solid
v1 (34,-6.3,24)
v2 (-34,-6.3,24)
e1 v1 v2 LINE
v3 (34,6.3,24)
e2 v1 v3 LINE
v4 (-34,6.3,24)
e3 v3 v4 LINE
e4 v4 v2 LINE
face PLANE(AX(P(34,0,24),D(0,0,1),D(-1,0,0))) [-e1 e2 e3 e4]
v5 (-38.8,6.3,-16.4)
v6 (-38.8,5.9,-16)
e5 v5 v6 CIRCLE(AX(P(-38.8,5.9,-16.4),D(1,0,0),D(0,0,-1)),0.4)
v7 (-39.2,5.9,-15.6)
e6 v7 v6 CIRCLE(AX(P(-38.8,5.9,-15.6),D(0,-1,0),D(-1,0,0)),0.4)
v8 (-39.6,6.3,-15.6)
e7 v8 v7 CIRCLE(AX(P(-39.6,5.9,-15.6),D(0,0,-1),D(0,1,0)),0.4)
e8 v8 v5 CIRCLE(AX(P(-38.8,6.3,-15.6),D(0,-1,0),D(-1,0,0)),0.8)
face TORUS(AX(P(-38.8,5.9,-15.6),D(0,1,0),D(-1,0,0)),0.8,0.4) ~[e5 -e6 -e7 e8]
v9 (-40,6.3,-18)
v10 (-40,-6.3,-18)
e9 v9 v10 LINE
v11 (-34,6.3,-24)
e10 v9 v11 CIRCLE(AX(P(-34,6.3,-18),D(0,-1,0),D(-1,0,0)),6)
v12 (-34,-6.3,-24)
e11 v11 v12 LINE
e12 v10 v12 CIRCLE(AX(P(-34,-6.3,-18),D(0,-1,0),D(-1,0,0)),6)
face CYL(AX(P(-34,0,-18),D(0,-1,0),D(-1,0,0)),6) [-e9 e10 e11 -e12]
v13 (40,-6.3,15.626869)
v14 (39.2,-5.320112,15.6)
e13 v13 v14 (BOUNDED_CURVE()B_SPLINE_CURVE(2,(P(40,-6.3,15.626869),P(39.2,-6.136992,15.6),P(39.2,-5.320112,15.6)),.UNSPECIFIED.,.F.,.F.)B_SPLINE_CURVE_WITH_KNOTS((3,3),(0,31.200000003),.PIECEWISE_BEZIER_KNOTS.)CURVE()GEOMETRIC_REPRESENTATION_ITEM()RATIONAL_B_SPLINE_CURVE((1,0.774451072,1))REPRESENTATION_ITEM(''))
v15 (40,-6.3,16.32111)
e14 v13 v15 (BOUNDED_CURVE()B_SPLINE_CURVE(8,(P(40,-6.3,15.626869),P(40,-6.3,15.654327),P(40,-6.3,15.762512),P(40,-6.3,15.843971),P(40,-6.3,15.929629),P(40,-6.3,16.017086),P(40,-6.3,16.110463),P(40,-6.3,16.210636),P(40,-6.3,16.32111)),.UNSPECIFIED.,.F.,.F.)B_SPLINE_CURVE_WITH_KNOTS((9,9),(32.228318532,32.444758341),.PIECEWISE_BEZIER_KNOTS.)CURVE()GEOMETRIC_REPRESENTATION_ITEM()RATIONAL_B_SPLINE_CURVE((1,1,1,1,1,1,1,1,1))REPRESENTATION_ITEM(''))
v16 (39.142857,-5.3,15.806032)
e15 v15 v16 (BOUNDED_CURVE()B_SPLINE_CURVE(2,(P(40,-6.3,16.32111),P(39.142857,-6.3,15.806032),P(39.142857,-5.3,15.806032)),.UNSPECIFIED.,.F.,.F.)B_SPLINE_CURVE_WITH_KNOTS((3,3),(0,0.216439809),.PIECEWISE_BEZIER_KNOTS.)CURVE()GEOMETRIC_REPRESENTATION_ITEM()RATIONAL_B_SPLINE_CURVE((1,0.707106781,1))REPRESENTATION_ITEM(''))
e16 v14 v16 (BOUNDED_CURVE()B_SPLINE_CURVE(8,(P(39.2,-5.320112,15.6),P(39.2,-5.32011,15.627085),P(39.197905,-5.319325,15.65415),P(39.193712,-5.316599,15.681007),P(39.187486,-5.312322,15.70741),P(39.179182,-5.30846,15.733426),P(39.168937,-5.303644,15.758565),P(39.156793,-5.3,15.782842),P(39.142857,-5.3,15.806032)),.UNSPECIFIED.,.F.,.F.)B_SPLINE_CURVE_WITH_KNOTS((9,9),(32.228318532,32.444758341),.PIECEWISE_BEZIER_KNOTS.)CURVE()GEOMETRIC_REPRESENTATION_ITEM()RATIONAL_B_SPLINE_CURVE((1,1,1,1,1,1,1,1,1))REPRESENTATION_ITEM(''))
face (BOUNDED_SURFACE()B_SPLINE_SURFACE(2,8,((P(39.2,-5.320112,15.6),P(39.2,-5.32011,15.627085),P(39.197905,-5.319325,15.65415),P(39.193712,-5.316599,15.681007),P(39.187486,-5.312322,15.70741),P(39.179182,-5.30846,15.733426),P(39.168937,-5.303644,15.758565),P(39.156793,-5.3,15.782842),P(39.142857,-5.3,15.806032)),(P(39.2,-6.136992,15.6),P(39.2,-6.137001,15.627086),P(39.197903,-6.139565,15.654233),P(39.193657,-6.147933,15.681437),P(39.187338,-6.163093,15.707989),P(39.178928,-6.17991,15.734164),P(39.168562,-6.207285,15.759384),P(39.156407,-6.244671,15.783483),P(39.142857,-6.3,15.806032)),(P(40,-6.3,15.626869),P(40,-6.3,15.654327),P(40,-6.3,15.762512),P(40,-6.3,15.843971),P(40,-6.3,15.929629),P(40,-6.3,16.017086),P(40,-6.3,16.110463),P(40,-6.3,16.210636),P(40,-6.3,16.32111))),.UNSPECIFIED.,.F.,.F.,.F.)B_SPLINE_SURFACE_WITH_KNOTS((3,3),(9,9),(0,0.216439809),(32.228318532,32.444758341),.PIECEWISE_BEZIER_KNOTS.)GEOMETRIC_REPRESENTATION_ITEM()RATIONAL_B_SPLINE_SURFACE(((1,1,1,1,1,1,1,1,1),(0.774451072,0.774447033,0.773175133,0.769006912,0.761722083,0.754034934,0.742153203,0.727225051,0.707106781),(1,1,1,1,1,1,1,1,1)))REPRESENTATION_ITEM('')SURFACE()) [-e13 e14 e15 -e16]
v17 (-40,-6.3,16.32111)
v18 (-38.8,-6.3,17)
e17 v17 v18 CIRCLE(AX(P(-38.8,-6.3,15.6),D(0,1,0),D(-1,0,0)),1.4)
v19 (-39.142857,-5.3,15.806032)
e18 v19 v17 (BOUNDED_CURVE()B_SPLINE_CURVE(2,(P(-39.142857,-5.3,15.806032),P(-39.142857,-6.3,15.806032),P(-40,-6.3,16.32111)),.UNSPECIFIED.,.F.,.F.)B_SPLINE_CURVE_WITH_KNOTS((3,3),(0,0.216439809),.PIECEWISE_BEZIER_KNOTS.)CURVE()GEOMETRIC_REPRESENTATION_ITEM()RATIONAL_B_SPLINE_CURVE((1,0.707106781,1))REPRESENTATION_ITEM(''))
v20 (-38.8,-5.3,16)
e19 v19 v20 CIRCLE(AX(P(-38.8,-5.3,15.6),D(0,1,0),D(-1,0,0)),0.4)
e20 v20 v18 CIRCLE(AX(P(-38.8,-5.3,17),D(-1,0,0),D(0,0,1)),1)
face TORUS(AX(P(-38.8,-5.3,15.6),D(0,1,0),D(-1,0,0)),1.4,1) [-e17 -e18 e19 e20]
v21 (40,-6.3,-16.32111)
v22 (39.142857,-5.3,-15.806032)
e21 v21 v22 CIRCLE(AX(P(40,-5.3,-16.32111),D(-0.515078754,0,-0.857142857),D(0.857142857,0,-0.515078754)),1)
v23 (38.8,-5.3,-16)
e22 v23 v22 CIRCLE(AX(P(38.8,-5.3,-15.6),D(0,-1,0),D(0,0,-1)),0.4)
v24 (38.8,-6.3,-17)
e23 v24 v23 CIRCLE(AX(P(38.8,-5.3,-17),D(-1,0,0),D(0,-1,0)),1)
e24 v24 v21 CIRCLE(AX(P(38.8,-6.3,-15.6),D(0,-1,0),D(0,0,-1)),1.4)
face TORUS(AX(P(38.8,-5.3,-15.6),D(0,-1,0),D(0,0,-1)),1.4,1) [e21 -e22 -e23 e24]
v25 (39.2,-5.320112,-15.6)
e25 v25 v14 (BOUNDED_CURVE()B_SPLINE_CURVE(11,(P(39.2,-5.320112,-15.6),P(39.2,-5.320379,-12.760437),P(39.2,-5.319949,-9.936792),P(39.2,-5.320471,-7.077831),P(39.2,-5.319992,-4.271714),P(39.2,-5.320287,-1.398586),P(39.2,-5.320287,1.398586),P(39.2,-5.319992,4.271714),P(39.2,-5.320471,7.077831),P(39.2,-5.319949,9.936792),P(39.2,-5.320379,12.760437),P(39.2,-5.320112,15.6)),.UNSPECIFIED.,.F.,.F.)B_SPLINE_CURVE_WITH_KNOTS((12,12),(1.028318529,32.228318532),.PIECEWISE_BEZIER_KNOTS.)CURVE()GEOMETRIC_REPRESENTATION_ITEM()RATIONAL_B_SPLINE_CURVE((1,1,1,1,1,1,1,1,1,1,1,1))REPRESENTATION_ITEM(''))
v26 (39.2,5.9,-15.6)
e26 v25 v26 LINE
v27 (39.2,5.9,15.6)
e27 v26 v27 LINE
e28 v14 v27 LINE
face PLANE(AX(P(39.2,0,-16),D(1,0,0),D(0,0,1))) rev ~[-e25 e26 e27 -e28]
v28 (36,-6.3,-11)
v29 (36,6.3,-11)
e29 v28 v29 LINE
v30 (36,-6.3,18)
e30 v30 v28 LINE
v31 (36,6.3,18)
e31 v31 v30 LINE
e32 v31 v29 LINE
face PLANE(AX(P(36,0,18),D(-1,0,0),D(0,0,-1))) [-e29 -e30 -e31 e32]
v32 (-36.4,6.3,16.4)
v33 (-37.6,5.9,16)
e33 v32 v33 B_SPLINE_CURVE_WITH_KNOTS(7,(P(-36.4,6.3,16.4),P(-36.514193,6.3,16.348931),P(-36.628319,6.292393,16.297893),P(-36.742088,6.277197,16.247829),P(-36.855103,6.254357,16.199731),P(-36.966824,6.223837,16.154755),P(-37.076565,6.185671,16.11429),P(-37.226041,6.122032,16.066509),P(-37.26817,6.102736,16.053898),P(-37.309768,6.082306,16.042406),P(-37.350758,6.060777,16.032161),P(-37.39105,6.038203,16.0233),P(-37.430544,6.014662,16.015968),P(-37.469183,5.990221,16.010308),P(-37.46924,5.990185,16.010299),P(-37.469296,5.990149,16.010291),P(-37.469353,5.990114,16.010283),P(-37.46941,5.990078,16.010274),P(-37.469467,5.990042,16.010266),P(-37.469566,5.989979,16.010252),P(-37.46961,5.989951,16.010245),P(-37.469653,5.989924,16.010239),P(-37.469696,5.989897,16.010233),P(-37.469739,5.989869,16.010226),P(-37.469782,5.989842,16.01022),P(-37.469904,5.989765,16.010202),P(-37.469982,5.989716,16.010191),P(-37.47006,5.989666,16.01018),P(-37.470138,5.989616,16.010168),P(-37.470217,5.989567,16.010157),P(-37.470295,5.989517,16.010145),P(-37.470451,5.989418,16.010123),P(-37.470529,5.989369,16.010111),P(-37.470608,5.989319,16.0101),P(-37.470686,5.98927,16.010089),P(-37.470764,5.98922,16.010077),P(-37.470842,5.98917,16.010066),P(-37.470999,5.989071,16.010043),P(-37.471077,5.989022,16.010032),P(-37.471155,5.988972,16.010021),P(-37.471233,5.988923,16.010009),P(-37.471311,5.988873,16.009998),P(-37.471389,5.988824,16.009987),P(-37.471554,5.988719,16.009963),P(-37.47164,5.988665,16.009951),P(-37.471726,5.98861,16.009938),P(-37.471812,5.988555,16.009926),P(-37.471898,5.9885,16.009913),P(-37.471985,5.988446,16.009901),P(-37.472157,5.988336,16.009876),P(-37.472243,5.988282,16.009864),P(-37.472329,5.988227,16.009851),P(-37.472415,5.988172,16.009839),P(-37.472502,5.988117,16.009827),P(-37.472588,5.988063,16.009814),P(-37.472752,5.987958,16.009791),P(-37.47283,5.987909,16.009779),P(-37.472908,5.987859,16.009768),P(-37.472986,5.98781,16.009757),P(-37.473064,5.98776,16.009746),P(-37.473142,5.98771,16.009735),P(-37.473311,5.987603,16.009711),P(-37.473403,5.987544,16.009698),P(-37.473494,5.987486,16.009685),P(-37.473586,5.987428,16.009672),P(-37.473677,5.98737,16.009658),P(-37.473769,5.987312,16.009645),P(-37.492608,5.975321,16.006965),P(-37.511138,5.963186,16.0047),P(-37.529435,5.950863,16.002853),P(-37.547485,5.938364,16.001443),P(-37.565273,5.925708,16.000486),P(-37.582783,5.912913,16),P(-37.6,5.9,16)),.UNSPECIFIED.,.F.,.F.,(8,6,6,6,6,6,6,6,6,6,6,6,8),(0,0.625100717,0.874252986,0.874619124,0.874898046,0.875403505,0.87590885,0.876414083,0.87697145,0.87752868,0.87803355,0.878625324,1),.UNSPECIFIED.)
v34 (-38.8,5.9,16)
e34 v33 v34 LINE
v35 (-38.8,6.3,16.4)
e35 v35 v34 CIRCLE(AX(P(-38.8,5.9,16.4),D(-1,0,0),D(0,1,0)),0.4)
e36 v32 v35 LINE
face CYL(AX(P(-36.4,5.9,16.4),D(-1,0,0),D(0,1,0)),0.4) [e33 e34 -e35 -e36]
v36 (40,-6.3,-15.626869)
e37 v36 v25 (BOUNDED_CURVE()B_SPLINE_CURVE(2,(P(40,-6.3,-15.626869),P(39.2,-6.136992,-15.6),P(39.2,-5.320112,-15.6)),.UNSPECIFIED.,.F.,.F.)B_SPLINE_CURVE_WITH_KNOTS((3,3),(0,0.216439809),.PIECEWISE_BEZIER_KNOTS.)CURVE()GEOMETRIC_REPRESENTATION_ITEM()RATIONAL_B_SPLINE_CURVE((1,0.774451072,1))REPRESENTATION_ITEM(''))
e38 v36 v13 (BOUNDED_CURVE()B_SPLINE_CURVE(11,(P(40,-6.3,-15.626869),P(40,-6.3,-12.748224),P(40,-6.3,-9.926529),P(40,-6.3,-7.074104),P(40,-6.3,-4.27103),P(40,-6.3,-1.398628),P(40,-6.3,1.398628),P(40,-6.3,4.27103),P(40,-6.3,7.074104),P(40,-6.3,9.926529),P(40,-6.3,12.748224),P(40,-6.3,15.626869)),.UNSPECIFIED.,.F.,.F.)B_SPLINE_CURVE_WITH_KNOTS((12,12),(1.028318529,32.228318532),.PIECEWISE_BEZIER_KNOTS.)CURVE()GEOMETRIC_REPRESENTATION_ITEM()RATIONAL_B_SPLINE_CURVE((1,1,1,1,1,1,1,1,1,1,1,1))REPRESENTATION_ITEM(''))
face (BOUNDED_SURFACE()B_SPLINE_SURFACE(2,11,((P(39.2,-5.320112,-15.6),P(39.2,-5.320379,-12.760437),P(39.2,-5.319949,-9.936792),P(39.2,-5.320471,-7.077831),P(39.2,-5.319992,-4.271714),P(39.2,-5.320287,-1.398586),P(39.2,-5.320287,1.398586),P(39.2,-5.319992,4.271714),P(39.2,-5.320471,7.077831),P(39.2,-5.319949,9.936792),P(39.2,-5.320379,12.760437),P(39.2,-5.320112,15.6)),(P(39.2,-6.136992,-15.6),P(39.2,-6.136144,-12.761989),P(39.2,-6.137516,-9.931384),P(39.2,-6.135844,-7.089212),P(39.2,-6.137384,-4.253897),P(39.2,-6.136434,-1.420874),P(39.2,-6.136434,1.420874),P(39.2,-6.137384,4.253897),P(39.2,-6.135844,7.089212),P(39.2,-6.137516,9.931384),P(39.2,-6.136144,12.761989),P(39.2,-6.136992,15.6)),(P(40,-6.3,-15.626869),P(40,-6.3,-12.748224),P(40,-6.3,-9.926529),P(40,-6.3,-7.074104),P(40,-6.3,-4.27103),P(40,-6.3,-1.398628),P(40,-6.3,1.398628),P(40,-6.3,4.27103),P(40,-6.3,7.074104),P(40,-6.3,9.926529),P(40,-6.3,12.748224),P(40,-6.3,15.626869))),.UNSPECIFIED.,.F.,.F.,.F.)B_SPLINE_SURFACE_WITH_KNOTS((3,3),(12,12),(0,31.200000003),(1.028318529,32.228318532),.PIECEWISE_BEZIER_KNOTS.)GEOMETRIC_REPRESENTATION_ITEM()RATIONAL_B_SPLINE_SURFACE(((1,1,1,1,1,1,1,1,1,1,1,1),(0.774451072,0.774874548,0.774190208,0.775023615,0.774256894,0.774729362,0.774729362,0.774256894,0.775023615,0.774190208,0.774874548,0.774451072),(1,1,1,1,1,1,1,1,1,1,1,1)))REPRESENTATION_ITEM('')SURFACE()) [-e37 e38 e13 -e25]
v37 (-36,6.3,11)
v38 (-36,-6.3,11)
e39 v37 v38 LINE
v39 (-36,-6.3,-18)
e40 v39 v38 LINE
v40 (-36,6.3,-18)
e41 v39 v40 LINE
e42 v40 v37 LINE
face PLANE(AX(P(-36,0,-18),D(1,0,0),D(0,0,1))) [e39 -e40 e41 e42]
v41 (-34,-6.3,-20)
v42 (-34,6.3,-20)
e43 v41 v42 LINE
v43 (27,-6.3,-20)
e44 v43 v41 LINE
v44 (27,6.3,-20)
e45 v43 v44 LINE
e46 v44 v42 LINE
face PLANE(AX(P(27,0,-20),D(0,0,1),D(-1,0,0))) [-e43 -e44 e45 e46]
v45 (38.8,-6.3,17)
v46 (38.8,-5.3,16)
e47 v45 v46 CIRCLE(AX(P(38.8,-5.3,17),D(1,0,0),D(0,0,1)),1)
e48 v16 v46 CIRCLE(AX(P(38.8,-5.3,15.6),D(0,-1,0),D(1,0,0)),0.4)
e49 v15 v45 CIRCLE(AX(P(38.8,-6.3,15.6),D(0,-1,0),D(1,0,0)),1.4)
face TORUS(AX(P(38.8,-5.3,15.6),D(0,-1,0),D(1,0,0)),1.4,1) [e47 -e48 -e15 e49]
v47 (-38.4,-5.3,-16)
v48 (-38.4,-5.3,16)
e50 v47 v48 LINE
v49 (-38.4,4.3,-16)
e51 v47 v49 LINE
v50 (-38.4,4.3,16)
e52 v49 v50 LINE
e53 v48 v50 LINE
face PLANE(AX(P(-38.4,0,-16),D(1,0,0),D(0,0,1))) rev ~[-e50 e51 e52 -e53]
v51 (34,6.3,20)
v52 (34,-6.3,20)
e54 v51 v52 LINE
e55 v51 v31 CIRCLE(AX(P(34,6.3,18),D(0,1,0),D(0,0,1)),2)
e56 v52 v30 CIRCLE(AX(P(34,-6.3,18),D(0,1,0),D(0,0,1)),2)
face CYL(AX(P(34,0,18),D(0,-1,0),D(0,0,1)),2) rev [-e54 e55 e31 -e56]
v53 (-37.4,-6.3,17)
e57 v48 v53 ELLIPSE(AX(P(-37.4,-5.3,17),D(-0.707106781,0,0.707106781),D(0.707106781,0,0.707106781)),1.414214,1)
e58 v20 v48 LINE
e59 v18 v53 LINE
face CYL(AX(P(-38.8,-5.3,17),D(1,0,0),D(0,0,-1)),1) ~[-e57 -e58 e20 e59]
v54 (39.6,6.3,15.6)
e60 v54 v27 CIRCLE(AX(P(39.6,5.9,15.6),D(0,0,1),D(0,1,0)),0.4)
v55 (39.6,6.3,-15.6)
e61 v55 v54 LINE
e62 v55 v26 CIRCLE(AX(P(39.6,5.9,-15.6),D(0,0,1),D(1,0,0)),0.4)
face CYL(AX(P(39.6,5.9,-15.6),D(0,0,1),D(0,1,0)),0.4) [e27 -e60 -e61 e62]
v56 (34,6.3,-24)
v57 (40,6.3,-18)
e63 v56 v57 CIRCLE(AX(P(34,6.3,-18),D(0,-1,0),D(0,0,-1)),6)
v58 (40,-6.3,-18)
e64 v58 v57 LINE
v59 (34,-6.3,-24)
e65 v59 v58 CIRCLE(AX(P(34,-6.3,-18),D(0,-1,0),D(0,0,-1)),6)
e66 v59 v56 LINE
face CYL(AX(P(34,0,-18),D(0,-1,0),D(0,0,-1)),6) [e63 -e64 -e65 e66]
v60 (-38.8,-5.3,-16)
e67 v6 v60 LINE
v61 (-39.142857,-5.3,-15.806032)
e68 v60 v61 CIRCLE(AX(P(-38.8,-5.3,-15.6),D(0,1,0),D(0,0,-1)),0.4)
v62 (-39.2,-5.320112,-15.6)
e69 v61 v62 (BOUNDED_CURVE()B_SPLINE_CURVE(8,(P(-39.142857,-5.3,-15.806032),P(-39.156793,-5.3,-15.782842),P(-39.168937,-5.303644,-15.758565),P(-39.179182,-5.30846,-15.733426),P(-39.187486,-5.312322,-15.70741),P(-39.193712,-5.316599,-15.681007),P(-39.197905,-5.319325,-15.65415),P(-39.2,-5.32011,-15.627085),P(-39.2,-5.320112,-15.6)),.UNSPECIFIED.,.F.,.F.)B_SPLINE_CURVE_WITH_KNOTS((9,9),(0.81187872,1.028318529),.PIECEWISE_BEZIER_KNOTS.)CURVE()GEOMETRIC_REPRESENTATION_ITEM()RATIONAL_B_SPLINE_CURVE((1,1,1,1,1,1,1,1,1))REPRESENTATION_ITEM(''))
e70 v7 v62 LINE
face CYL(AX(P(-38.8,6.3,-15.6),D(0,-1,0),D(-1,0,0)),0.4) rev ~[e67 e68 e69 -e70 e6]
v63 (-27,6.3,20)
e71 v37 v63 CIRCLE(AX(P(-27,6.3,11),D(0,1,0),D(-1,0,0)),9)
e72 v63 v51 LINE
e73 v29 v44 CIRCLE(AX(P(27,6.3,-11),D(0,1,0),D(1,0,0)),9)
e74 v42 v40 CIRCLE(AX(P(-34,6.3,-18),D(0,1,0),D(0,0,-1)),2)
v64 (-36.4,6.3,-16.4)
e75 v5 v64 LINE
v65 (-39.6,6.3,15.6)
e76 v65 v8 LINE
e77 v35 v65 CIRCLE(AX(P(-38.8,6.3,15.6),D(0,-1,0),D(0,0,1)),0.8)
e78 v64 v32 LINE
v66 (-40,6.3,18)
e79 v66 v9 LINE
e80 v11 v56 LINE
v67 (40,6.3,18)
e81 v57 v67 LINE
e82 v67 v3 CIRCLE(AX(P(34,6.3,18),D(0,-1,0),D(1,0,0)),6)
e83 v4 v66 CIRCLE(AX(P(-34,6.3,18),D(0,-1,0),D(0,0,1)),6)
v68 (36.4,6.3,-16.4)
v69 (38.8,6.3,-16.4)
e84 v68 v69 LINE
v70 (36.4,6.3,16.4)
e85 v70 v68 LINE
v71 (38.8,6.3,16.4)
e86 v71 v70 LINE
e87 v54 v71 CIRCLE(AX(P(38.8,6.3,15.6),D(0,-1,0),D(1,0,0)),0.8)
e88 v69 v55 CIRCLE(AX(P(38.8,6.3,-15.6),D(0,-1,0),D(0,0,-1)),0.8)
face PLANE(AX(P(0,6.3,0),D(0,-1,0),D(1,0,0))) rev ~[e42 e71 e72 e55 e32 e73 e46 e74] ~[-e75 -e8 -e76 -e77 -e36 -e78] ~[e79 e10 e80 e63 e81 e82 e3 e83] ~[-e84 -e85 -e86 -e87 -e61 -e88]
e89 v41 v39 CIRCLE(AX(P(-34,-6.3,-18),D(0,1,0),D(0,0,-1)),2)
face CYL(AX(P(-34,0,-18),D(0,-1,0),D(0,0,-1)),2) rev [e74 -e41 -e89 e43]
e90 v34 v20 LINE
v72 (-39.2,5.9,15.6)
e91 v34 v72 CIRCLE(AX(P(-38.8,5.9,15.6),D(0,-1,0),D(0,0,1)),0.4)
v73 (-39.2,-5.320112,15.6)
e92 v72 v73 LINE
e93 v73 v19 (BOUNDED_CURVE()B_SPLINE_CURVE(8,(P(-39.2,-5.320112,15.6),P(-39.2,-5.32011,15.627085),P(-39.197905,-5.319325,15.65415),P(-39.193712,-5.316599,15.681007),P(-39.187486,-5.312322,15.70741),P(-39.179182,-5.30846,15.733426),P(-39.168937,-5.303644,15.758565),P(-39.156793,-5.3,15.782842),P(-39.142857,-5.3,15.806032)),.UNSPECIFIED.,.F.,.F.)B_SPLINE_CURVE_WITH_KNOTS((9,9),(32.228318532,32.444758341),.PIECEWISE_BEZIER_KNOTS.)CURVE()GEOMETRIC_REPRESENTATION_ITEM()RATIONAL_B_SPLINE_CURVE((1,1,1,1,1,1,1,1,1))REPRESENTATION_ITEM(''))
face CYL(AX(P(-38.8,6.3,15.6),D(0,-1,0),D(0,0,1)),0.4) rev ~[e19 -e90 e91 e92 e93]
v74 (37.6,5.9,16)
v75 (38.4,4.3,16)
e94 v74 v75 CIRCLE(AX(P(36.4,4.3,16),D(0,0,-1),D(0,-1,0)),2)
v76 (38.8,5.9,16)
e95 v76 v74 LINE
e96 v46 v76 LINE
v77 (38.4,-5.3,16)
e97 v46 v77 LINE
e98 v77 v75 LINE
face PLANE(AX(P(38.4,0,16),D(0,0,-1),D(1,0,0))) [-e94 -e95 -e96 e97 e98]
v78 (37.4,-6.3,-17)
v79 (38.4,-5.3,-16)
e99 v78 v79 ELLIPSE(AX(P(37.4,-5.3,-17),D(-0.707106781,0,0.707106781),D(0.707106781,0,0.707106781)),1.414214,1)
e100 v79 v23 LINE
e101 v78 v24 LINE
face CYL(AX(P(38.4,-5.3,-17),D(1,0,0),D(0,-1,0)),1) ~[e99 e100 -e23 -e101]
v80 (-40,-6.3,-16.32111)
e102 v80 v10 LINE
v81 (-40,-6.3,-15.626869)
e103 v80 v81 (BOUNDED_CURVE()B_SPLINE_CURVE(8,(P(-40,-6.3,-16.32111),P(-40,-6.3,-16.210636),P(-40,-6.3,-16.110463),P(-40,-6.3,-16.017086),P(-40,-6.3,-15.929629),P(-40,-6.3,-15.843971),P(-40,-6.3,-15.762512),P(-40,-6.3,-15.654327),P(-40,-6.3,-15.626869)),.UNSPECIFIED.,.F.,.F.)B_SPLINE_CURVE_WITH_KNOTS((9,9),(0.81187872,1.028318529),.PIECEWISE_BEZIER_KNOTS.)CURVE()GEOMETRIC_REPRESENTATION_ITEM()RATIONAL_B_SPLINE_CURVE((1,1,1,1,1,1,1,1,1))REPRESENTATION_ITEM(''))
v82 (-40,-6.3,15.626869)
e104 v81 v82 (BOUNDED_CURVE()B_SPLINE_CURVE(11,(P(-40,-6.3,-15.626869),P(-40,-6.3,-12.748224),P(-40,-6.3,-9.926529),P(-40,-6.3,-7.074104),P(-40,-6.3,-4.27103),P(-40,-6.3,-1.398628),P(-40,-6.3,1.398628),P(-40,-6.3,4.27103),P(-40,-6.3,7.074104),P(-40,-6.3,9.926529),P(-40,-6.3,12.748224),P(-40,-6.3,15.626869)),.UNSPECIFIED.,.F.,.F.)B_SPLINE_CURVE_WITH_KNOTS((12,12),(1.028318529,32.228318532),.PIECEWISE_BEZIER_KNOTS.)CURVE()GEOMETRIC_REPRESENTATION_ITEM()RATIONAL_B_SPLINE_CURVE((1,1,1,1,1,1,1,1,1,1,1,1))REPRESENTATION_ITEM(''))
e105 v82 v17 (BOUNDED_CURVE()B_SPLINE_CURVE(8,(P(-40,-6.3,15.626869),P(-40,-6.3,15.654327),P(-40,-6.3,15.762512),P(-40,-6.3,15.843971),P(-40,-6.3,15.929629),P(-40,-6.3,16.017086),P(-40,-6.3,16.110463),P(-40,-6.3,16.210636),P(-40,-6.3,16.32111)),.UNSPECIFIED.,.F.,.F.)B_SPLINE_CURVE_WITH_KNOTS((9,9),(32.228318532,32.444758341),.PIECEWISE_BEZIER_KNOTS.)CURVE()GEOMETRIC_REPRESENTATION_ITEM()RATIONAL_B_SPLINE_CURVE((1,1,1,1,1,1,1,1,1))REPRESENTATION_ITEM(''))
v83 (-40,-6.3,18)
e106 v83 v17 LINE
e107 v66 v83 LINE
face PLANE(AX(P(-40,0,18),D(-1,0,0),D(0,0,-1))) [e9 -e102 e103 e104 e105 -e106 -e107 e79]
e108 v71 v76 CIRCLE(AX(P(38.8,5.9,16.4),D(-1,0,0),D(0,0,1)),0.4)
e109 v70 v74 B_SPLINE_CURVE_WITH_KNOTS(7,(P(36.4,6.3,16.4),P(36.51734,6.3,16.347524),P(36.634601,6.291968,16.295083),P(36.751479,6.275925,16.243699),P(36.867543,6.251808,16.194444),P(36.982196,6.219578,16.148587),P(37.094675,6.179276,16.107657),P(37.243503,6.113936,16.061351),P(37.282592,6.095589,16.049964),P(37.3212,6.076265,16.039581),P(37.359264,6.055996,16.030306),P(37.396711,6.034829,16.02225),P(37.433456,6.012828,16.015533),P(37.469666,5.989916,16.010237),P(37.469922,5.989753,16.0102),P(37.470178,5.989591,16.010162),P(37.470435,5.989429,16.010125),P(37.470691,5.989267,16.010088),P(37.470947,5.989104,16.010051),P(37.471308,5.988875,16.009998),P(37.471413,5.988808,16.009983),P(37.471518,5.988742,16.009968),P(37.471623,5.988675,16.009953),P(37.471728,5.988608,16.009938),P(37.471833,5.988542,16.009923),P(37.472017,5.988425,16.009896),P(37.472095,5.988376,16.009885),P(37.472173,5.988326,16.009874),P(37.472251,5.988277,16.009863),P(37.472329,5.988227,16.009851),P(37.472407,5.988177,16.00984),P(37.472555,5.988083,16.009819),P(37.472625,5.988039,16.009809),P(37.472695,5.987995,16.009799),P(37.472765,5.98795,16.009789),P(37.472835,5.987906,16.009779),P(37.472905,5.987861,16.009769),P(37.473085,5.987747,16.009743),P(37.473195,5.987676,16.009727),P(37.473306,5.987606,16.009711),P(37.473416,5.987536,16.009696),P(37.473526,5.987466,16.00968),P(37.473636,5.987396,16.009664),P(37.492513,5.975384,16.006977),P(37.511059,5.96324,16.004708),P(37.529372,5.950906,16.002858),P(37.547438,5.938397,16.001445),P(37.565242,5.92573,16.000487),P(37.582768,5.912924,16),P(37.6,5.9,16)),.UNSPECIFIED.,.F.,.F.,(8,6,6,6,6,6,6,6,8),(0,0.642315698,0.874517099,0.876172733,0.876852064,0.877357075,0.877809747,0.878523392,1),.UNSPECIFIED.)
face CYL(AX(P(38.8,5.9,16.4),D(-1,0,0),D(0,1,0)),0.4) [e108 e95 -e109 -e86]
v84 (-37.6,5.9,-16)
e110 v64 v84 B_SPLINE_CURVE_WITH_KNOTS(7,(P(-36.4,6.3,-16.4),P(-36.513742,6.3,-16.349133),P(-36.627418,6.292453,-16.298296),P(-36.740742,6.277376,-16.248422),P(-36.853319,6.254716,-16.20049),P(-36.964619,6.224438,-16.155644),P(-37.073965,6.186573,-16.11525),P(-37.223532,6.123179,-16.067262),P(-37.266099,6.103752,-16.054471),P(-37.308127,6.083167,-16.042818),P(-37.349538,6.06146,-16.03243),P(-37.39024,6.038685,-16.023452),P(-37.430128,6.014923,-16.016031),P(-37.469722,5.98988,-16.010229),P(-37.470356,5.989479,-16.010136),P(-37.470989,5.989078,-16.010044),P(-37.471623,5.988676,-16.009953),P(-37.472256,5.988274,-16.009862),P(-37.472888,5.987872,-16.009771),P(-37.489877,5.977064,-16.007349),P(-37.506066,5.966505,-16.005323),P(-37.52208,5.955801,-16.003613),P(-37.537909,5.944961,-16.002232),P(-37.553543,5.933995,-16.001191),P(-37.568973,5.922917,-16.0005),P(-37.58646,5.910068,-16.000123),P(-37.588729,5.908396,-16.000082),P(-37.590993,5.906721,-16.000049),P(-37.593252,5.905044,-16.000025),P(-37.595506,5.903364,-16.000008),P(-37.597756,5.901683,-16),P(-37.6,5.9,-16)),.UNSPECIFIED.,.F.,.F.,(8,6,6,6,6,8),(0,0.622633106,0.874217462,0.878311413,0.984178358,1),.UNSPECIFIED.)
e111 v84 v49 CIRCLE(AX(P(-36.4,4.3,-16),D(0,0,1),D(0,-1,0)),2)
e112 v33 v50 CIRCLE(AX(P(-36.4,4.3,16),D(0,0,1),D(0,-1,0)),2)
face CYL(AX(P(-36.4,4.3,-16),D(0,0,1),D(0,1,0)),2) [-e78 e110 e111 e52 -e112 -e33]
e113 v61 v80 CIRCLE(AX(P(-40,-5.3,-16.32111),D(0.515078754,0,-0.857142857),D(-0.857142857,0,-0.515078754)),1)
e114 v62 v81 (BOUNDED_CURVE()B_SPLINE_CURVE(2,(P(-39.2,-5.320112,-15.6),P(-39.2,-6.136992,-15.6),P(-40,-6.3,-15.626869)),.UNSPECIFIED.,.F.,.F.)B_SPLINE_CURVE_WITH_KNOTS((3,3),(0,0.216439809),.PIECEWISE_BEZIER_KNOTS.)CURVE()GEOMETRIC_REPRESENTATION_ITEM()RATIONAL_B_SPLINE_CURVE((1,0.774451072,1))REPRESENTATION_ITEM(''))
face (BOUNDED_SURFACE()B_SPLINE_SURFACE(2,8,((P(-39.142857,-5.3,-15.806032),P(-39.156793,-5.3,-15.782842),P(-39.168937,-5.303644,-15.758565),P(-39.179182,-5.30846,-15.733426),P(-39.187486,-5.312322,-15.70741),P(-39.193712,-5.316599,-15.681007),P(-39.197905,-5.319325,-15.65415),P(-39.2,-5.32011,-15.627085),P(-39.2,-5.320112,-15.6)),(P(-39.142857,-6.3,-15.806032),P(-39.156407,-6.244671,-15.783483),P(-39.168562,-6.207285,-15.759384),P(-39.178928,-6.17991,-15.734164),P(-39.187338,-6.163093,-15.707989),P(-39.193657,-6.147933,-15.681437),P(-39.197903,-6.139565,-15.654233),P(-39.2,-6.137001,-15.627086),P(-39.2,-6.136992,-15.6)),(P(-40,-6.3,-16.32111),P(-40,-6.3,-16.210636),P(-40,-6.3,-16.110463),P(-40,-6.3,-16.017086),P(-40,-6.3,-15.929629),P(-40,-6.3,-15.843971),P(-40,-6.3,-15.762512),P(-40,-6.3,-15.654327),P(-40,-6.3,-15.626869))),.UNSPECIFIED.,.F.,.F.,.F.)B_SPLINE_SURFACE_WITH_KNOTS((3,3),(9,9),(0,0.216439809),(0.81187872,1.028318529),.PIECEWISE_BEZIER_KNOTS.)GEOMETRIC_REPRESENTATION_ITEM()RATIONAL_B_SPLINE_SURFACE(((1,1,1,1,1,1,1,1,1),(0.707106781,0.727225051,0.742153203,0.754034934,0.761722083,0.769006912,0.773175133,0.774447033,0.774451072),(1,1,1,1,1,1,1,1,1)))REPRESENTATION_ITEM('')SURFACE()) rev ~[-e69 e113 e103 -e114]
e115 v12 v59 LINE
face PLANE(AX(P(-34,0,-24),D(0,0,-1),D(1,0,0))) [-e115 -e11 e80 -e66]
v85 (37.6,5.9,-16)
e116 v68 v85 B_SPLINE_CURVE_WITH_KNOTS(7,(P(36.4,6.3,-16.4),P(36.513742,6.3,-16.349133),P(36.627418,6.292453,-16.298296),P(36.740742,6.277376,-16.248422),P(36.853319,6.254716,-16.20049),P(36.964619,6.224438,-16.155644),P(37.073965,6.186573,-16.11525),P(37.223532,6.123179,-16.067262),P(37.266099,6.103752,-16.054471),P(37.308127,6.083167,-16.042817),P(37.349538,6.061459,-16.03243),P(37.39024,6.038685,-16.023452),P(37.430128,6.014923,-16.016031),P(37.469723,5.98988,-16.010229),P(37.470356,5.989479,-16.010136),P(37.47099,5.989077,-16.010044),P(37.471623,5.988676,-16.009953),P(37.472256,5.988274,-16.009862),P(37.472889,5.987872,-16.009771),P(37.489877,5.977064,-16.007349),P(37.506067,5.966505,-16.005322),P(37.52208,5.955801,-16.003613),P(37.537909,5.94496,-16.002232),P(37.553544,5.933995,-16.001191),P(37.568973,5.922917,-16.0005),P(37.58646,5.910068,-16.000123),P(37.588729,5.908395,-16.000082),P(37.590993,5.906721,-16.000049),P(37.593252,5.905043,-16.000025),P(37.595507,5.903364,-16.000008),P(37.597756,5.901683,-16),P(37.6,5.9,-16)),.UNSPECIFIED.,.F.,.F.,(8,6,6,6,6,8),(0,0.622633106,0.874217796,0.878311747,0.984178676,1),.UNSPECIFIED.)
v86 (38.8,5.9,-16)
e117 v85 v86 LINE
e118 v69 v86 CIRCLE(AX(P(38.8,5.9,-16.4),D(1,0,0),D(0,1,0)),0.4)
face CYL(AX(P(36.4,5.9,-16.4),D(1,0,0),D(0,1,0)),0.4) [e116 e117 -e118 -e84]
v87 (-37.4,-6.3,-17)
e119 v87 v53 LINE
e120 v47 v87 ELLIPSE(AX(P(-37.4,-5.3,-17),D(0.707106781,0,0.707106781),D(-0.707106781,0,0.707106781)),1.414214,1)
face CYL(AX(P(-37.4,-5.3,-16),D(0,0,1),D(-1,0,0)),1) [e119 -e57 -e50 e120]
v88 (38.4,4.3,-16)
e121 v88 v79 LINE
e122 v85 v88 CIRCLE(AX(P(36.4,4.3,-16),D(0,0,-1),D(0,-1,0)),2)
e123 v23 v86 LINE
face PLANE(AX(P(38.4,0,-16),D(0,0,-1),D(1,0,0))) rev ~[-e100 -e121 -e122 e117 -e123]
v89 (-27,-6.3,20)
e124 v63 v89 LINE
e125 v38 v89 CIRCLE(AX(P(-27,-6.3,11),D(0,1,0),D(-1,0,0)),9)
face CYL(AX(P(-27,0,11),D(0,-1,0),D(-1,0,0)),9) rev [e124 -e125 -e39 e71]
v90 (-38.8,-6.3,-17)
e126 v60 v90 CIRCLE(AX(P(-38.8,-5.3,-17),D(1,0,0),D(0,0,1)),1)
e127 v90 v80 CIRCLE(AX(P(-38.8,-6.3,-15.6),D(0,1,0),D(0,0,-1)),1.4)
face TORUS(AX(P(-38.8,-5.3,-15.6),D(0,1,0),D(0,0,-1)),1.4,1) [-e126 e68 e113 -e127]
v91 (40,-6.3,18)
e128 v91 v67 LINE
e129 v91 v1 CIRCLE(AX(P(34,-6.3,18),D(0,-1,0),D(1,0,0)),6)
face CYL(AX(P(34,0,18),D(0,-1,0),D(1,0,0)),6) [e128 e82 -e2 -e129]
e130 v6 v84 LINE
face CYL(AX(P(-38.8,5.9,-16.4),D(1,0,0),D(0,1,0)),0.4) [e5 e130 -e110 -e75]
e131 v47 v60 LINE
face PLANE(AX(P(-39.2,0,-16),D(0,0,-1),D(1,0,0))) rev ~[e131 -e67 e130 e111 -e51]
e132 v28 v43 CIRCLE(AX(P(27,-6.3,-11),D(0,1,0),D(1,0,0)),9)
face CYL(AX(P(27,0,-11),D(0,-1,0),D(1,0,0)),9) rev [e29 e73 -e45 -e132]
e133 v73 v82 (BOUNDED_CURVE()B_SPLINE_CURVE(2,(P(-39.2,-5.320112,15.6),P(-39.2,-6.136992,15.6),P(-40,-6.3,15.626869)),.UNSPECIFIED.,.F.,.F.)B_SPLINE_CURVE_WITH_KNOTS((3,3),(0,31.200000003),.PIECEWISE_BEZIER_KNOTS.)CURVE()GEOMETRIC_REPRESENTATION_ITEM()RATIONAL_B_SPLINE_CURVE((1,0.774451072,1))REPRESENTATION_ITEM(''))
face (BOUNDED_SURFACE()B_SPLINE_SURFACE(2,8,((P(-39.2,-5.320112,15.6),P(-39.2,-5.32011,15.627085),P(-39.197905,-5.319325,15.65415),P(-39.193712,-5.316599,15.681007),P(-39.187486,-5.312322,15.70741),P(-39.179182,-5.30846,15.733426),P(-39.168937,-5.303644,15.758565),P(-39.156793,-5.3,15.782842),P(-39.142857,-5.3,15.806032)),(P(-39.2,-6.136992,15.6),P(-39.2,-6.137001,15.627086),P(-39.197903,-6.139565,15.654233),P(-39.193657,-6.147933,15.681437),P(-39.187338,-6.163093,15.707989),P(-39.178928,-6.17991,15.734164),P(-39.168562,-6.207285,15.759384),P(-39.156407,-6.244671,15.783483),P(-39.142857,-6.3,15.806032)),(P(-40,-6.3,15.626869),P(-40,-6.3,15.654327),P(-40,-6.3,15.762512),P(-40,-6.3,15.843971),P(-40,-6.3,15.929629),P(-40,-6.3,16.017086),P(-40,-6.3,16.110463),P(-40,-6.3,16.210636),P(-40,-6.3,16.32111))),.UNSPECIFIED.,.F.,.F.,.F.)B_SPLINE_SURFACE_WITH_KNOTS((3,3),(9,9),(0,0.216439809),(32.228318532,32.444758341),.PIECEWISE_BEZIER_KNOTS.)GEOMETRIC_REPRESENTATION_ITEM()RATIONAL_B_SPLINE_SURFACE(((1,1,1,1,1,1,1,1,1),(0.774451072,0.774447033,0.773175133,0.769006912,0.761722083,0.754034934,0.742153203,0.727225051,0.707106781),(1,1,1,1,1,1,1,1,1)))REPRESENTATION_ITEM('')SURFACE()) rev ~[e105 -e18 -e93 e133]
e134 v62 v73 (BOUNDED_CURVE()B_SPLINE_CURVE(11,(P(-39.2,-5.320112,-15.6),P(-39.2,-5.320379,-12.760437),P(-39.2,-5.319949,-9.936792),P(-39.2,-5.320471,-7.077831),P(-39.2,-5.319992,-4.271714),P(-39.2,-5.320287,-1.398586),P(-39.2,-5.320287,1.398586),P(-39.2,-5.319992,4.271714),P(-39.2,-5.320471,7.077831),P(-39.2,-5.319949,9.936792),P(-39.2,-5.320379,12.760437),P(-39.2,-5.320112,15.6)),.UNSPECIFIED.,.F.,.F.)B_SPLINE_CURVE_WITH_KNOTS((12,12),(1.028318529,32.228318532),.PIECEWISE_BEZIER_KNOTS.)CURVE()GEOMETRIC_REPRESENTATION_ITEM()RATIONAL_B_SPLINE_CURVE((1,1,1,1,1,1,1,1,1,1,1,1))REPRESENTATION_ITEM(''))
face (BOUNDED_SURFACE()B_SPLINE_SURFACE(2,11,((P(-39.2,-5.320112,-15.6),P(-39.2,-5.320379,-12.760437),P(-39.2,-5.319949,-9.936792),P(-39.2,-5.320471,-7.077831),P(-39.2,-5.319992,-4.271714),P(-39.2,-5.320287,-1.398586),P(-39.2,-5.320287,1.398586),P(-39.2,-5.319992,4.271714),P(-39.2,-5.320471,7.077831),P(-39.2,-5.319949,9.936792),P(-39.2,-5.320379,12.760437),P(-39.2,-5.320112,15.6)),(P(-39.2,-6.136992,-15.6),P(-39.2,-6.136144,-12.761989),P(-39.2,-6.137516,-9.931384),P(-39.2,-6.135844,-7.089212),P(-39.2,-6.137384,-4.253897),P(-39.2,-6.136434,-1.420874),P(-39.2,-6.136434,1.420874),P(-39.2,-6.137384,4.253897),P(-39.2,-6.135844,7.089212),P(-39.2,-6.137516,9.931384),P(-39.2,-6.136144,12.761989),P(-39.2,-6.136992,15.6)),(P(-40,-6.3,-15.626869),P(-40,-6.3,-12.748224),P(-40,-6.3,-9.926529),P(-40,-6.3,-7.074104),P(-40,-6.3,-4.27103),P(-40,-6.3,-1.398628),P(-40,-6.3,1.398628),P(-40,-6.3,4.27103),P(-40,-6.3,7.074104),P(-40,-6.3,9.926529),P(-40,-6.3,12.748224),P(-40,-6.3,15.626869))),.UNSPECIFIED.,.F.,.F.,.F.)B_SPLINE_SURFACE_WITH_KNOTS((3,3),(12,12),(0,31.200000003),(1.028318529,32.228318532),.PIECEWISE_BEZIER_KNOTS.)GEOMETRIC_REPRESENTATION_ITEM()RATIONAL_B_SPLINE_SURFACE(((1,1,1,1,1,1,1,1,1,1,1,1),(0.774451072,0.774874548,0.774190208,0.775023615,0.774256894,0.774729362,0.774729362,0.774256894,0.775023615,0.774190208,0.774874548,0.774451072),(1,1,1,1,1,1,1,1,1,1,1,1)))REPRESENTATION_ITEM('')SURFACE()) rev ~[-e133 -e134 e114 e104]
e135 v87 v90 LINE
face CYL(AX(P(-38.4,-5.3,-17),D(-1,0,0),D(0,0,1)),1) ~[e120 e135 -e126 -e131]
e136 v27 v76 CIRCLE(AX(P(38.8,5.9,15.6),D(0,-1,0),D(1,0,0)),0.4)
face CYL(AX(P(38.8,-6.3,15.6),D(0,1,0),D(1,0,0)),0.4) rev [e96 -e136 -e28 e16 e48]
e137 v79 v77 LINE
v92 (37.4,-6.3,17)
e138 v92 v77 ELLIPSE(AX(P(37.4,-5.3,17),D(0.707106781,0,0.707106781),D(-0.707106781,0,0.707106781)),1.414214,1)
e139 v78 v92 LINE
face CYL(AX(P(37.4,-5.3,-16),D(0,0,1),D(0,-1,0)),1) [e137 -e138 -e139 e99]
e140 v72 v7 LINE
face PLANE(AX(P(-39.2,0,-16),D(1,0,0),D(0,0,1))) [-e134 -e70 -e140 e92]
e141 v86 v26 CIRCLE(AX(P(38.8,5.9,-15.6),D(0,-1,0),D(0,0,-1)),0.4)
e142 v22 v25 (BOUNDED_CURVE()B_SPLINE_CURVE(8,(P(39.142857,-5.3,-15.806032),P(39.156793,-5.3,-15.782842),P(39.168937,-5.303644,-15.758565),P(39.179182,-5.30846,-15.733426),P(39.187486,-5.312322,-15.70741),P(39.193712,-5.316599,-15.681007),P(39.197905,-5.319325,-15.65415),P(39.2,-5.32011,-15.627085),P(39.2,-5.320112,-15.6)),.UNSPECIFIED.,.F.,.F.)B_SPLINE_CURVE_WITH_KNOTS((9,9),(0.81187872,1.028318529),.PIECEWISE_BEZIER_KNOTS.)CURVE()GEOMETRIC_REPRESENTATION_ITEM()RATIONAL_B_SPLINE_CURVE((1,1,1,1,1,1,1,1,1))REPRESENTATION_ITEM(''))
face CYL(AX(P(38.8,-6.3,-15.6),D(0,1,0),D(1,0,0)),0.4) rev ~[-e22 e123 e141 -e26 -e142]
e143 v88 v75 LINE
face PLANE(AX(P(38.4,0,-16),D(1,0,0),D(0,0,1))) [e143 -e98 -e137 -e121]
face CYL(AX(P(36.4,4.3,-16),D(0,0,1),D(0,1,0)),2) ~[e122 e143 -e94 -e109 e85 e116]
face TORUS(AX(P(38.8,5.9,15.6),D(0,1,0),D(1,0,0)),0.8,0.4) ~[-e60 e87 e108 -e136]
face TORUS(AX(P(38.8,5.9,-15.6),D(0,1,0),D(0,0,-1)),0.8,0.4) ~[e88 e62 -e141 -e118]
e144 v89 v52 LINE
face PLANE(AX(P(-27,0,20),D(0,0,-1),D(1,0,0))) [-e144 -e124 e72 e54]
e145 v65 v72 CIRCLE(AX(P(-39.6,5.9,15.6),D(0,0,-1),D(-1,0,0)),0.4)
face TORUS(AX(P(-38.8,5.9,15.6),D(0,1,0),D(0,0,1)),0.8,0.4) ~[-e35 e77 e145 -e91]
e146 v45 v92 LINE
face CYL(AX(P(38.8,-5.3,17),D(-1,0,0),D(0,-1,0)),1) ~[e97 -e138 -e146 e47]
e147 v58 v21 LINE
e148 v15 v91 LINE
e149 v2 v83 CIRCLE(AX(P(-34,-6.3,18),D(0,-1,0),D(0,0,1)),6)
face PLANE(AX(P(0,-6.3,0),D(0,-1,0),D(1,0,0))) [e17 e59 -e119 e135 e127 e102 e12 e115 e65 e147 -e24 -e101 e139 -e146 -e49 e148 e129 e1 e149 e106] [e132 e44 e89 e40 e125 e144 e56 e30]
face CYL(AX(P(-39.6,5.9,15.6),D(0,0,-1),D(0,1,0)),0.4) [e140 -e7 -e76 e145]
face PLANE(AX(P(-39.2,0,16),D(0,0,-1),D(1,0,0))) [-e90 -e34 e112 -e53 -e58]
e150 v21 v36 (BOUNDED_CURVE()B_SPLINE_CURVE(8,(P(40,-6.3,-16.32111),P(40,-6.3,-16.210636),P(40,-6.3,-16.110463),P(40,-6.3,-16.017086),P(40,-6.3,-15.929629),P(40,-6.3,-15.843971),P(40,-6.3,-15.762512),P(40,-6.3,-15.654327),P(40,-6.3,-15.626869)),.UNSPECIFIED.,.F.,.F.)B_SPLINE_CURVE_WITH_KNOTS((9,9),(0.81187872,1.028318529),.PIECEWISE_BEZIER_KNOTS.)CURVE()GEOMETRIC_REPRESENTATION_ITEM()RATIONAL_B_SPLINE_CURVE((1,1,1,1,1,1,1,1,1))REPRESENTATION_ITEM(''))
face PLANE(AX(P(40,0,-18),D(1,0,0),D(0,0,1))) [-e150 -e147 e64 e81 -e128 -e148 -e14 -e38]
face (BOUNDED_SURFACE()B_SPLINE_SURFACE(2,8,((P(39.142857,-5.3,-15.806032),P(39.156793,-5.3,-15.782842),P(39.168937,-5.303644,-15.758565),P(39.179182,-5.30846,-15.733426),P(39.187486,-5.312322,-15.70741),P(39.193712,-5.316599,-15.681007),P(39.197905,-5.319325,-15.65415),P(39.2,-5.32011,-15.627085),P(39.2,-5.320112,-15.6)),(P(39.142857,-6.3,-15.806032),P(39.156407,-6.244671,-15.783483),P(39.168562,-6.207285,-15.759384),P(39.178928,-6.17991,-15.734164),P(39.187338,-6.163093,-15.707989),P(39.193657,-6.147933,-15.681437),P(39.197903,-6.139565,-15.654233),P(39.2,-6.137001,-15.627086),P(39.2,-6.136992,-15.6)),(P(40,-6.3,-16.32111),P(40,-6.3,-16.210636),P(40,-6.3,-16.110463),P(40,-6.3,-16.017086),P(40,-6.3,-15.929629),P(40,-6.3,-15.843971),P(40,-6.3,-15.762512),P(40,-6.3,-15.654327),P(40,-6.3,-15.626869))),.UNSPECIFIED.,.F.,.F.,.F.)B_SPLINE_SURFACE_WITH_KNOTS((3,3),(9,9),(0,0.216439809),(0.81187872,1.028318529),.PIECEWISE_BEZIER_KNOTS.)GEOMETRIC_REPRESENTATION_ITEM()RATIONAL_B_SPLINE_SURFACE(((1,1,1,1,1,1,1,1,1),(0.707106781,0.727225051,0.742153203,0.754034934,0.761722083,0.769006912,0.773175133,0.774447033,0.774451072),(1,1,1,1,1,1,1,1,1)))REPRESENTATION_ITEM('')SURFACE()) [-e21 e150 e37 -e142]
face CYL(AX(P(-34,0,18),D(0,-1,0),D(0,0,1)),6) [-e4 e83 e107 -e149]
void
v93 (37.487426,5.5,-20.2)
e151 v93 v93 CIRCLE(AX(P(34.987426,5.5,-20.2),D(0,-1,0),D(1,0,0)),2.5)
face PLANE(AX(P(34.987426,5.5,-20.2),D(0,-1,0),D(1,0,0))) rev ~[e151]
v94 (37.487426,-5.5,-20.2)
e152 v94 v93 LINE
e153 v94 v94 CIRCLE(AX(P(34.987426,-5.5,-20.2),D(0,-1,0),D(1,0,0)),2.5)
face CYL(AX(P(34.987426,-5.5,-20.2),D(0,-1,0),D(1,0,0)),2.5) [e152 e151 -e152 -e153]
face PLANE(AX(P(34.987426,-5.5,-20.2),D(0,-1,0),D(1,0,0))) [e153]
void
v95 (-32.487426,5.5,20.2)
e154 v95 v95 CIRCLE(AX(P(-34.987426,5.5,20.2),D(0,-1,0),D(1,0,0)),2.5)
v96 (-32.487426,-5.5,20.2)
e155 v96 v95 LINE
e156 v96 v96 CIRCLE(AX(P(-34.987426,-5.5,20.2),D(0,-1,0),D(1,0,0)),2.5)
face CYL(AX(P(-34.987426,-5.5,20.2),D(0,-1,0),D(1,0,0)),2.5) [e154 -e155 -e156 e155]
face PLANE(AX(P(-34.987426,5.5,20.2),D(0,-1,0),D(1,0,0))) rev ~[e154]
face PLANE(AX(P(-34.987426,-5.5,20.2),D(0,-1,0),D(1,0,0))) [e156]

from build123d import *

# Parameters (mm, degrees)
F0_W     = 0.8
F0_H     = 32
F1_DEPTH = 6.3
F3_R     = 2.5
F4_DEPTH = 11
F5_R     = 2
F6_F1_R  = 0.4
F6_F2_R  = 0.4
F7_R     = 1


# Not quite as in the source:
# - a feature names something its author has since deleted; it is built from what else it names


with BuildPart() as f1:
    # F0 (on Front) → F1 (new body, symmetric)
    with BuildSketch(Plane.XZ):
        with BuildLine():
            Line((34, 24), (-34, 24))
            ThreePointArc((-34, 24), (-38.2426406871, 22.2426406871), (-40, 18))
            Line((-40, 18), (-40, -18))
            ThreePointArc((-40, -18), (-38.2426406871, -22.2426406871), (-34, -24))
            Line((-34, -24), (34, -24))
            ThreePointArc((34, -24), (38.2426406871, -22.2426406871), (40, -18))
            Line((40, -18), (40, 18))
            ThreePointArc((40, 18), (38.2426406871, 22.2426406871), (34, 24))
        make_face()
        with Locations((-38.8, 0)):
            Rectangle(F0_W, F0_H, mode=Mode.SUBTRACT)
        with BuildLine():
            ThreePointArc((-36, 11), (-33.3639610307, 17.3639610307), (-27, 20))
            Line((-27, 20), (34, 20))
            ThreePointArc((34, 20), (35.4142135624, 19.4142135624), (36, 18))
            Line((36, 18), (36, -11))
            ThreePointArc((36, -11), (33.3639610307, -17.3639610307), (27, -20))
            Line((27, -20), (-34, -20))
            ThreePointArc((-34, -20), (-35.4142135624, -19.4142135624), (-36, -18))
            Line((-36, -18), (-36, 11))
        make_face(mode=Mode.SUBTRACT)
        with Locations((38.8, 0)):
            Rectangle(F0_W, F0_H, mode=Mode.SUBTRACT)
    extrude(amount=F1_DEPTH, both=True)

    # F3 (on offset) → F4 (cut)
    with BuildSketch(Plane.XZ.offset(5.5)):
        with Locations((-34.9874263129, 20.2)):
            Circle(F3_R)
        with Locations((34.9874263129, -20.2)):
            Circle(F3_R)
    extrude(amount=-F4_DEPTH, mode=Mode.SUBTRACT)

    # F5
    f5_edges = [f1.edges().sort_by_distance(p)[0] for p in [
        (-38.4, 6.3, 0),
        (38.4, 6.3, 0),
    ]]
    fillet(f5_edges, radius=F5_R)

    # F6: fillet of radius 0.4 on 8 edges, made by hand

    # F6_f1
    f6_f1_edges = [f1.edges().sort_by_distance(p)[0] for p in [
        (-39.2, 0, 16),
        (-39.2, 0, -16),
        (39.2, 0, -16),
        (39.2, 0, 16),
    ]]
    fillet(f6_f1_edges, radius=F6_F1_R)

    # F6_f2
    f6_f2_edges = [f1.edges().sort_by_distance(p)[0] for p in [
        (38.6, 6.3, 16),
        (-38.6, 6.3, 16),
        (-39.2, 6.3, 0),
        (39.2, 6.3, 0),
        (-37.4, 6.3, 16),
        (37.4, 6.3, 16),
        (39.0828427125, 6.3, 15.8828427125),
        (39.0828427125, 6.3, -15.8828427125),
        (-39.0828427125, 6.3, -15.8828427125),
        (-39.0828427125, 6.3, 15.8828427125),
    ]]
    fillet(f6_f2_edges, radius=F6_F2_R)

    # F7
    f7_edges = [f1.edges().sort_by_distance(p)[0] for p in [
        (38.4, -6.3, 0),
        (39.2, -6.3, 0),
        (-38.4, -6.3, 0),
        (-39.2, -6.3, 0),
        (38.6, -6.3, -16),
        (38.6, -6.3, 16),
        (-38.6, -6.3, -16),
        (-38.6, -6.3, 16),
    ]]
    fillet(f7_edges, radius=F7_R)


solid = f1.part
